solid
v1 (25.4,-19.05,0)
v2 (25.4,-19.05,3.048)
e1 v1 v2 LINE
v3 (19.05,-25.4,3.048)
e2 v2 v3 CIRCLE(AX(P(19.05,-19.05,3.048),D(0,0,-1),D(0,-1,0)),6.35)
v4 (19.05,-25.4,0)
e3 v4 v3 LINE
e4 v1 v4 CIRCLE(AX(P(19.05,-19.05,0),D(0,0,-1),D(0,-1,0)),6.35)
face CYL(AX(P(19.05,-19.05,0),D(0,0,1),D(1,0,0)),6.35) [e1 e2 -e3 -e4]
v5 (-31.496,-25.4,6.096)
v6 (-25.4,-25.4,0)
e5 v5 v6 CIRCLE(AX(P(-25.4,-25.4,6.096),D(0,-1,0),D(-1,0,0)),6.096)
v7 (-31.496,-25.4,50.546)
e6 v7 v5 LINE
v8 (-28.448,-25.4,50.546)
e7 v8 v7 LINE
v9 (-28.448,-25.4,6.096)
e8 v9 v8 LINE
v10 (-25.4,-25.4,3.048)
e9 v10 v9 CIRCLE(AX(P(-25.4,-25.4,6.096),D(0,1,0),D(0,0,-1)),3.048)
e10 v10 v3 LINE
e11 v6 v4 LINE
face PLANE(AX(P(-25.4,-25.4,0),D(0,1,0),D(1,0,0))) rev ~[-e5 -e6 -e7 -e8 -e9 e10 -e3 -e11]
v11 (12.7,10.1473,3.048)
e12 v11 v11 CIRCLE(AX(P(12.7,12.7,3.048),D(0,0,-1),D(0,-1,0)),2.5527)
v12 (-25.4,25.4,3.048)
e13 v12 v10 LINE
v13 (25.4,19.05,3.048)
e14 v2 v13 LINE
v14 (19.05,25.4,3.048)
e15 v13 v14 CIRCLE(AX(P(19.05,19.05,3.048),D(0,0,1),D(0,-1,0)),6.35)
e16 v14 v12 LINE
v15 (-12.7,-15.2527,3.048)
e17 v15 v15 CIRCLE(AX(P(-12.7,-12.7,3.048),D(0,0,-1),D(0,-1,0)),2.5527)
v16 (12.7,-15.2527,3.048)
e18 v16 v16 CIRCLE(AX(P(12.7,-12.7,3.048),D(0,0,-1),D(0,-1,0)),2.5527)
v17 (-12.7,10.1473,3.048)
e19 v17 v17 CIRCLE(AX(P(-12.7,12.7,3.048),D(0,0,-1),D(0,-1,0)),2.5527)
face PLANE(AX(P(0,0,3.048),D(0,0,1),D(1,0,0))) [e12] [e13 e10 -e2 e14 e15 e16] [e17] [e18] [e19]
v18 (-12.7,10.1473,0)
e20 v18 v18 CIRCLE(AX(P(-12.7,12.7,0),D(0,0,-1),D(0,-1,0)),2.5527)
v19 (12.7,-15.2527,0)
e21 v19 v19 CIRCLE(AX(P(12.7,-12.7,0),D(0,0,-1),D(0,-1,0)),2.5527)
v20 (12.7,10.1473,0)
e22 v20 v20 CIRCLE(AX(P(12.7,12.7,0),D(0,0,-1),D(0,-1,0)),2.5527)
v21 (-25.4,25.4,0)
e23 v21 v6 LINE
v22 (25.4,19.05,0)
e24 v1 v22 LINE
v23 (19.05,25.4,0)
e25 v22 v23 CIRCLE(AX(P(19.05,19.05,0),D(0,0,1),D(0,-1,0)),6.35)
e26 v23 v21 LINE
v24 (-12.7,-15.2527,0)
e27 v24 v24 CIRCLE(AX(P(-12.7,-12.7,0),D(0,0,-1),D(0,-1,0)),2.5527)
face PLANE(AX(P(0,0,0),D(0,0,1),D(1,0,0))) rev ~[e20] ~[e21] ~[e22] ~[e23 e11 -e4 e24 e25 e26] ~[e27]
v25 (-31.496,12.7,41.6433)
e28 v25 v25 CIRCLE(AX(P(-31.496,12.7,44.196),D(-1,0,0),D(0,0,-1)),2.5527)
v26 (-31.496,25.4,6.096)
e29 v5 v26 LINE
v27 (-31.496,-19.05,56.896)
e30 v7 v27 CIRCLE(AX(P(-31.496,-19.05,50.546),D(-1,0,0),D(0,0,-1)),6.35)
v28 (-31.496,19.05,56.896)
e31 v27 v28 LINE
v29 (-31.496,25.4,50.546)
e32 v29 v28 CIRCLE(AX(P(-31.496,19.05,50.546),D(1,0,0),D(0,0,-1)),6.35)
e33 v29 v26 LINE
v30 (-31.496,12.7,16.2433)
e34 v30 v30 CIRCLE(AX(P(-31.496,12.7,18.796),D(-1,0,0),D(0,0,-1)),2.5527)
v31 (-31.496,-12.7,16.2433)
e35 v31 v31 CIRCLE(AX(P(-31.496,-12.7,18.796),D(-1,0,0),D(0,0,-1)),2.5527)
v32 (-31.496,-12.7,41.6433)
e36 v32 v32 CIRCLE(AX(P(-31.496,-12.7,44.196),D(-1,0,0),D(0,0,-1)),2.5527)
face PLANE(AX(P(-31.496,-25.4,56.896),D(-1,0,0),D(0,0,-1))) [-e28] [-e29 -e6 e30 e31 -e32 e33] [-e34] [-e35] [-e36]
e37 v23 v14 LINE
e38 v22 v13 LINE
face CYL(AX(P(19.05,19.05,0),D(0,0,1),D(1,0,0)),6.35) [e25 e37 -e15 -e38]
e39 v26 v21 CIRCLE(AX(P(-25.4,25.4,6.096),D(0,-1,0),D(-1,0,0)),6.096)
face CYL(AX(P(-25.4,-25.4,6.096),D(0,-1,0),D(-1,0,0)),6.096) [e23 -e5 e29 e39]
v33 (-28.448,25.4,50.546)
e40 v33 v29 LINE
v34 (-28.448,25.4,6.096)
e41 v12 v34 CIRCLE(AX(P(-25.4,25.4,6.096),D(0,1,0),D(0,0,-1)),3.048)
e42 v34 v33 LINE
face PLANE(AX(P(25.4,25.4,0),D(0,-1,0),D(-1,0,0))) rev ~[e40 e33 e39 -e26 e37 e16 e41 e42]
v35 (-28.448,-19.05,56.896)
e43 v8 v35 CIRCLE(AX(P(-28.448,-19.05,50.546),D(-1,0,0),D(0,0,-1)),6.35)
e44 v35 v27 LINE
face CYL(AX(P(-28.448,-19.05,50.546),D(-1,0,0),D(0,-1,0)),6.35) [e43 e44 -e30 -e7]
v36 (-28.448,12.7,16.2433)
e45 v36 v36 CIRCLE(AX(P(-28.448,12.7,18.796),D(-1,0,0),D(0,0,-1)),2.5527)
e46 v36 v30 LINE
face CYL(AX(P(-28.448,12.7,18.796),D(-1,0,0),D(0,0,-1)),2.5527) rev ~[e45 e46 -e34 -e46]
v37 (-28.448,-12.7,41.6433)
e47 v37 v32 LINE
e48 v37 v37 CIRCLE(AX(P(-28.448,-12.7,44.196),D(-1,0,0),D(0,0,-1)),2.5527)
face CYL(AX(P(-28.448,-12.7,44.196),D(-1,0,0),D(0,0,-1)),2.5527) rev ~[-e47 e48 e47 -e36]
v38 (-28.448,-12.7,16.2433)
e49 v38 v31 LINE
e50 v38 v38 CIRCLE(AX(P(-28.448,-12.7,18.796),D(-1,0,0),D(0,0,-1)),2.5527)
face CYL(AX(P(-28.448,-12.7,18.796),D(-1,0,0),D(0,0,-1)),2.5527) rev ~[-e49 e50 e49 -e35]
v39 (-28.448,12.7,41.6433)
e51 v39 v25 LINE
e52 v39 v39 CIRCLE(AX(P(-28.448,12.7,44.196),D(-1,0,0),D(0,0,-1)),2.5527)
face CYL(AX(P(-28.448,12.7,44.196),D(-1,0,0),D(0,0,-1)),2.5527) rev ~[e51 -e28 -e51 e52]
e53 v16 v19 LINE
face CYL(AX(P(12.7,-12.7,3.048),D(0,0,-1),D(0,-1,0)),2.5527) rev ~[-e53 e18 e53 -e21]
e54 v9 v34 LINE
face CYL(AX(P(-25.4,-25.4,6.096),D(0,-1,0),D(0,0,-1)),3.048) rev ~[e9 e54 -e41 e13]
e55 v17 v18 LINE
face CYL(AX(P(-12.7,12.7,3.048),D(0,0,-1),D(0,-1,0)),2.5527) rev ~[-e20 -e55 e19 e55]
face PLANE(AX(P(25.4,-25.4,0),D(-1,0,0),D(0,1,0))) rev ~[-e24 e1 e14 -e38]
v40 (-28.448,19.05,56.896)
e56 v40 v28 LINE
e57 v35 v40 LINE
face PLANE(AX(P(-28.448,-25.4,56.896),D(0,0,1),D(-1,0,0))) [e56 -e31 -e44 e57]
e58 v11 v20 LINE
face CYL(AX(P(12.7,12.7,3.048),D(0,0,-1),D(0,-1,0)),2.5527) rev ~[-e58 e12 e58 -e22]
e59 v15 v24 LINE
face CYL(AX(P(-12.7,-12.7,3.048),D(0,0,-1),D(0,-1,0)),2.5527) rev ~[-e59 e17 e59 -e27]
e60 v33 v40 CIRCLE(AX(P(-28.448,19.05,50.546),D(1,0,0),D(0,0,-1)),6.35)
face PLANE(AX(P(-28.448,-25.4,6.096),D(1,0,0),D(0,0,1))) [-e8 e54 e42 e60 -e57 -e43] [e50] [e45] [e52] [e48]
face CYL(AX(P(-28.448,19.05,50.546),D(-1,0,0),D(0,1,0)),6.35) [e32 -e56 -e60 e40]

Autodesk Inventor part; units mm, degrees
ref_plane "YZ Plane" through (0, 0, 0) normal (1, 0, 0) x (0, 1, 0)
ref_plane "XZ Plane" through (0, 0, 0) normal (0, 1, 0) x (-1, 0, 0)
ref_plane "XY Plane" through (0, 0, 0) normal (0, 0, 1) x (1, 0, 0)
sketch "Sketch1" plane through (0, 0, 0) normal (0, 0, 1) x (1, 0, 0)
  line L0 (25.4, 25.4) -> (-25.4, 25.4)
  line L1 (-25.4, 25.4) -> (-25.4, -25.4)
  line L2 (-25.4, -25.4) -> (25.4, -25.4)
  line L3 (25.4, -25.4) -> (25.4, 25.4)
  line L4 (25.4, 25.4) -> (-25.4, -25.4) construction
  line L5 (-25.4, 25.4) -> (25.4, -25.4) construction
  point P0 (0, 0)
  dimension "d0" = 50.8
  dimension "d1" = 50.8
extrude "Plate1" add sketch "Sketch1" along normal blind 3.048
sketch "Sketch2" plane through (-28.448, -25.4, 6.096) normal (-1, 0, 0) x (0, -1, 0)
  line L0 (-50.8, 0) -> (0, 0)
  line L1 (0, 0) -> (0, 50.8)
  line L2 (0, 50.8) -> (-50.8, 50.8)
  line L3 (-50.8, 50.8) -> (-50.8, 0)
edge flange "Flange1" height 56.896 angle 90 thickness 3.048 bend radius 3.048 thickness toward (-1, 0, 0) relief tear relief width 3.048 relief depth 1.524 edges at (-25.4, 0, 3.048) wall of the first edge with corners at (-28.448, 25.4, 6.096) (-28.448, -25.4, 6.096) (-28.448, -25.4, 56.896) (-28.448, 25.4, 56.896)
bend "Bend1"
corner "Corner1"
sketch "Sketch3" plane through (-28.448, -25.4, 56.896) normal (1, 0, 0) x (0, 0, -1)
  line L0 (50.8, 0) -> (50.8, 50.8) construction
  line L1 (0, 50.8) -> (50.8, 50.8) construction
  line L2 (0, 50.8) -> (0, 0) construction
  line L3 (0, 0) -> (50.8, 0) construction
  point P0 (56.896, 25.4)
  point P1 (38.1, 38.1)
  point P2 (38.1, 12.7)
  point P3 (12.7, 38.1)
  point P4 (12.7, 12.7)
  dimension "d13" = 12.7
  dimension "d14" = 12.7
  dimension "d17" = 25.4
  dimension "d20" = 25.4
hole "Hole1" at (-28.448, 12.7, 18.796) at (-28.448, -12.7, 18.796) at (-28.448, 12.7, 44.196) at (-28.448, -12.7, 44.196) direction (-1, 0, 0) diameter 5.1054 end through all clearance for "Flat Head Machine Screw (82)" size "#10" standard "Ansi Unified Screw Threads"
sketch "Sketch4" plane through (0, 0, 3.048) normal (0, 0, 1) x (1, 0, 0)
  line L0 (-25.4, 25.4) -> (25.4, 25.4) construction
  line L1 (-25.4, -25.4) -> (-25.4, 25.4) construction
  line L2 (25.4, -25.4) -> (-25.4, -25.4) construction
  line L3 (25.4, 25.4) -> (25.4, -25.4) construction
  point P0 (0, 0)
  point P1 (-12.7, 12.7)
  point P2 (12.7, 12.7)
  point P3 (-12.7, -12.7)
  point P4 (12.7, -12.7)
  dimension "d30" = 12.7
  dimension "d31" = 12.7
  dimension "d34" = 25.4
  dimension "d37" = 25.4
hole "Hole2" at (-12.7, 12.7, 3.048) at (12.7, 12.7, 3.048) at (-12.7, -12.7, 3.048) at (12.7, -12.7, 3.048) direction (0, 0, -1) diameter 5.1054 end through all clearance for "Flat Head Machine Screw (82)" size "#10" standard "Ansi Unified Screw Threads"
fillet "Corner Round1" radius 6.35 4 edges at (-29.972, -25.4, 56.896) (-29.972, 25.4, 56.896) (25.4, 25.4, 1.524) (25.4, -25.4, 1.524)
equation "\"d28\" = Thickness"
equation "\"d2\" = Thickness"
equation "\"d3\" = BendReliefWidth"
equation "\"d4\" = BendReliefDepth"
equation "\"d5\" = MinimumRemnant"
equation "\"d6\" = TransitionRadius"
equation "\"d9\" = BendRadius"
equation "\"d10\" = CornerReliefSize"
equation "\"d11\" = GapSize"
equation "\"d12\" = JacobiRadiusSize"
equation "\"BendRadius\" = Thickness"
equation "\"BendReliefWidth\" = Thickness"
equation "\"BendReliefDepth\" = 0.5 * Thickness"
equation "\"CornerReliefSize\" = 4 * Thickness"
equation "\"MinimumRemnant\" = 2 * Thickness"
equation "\"TransitionRadius\" = BendRadius"
equation "\"JacobiRadiusSize\" = BendRadius"
equation "\"GapSize\" = Thickness"
equation "\"Thickness\" = 3.048"
properties part number "hopper_side_bracket" material "Aluminum 6061"
